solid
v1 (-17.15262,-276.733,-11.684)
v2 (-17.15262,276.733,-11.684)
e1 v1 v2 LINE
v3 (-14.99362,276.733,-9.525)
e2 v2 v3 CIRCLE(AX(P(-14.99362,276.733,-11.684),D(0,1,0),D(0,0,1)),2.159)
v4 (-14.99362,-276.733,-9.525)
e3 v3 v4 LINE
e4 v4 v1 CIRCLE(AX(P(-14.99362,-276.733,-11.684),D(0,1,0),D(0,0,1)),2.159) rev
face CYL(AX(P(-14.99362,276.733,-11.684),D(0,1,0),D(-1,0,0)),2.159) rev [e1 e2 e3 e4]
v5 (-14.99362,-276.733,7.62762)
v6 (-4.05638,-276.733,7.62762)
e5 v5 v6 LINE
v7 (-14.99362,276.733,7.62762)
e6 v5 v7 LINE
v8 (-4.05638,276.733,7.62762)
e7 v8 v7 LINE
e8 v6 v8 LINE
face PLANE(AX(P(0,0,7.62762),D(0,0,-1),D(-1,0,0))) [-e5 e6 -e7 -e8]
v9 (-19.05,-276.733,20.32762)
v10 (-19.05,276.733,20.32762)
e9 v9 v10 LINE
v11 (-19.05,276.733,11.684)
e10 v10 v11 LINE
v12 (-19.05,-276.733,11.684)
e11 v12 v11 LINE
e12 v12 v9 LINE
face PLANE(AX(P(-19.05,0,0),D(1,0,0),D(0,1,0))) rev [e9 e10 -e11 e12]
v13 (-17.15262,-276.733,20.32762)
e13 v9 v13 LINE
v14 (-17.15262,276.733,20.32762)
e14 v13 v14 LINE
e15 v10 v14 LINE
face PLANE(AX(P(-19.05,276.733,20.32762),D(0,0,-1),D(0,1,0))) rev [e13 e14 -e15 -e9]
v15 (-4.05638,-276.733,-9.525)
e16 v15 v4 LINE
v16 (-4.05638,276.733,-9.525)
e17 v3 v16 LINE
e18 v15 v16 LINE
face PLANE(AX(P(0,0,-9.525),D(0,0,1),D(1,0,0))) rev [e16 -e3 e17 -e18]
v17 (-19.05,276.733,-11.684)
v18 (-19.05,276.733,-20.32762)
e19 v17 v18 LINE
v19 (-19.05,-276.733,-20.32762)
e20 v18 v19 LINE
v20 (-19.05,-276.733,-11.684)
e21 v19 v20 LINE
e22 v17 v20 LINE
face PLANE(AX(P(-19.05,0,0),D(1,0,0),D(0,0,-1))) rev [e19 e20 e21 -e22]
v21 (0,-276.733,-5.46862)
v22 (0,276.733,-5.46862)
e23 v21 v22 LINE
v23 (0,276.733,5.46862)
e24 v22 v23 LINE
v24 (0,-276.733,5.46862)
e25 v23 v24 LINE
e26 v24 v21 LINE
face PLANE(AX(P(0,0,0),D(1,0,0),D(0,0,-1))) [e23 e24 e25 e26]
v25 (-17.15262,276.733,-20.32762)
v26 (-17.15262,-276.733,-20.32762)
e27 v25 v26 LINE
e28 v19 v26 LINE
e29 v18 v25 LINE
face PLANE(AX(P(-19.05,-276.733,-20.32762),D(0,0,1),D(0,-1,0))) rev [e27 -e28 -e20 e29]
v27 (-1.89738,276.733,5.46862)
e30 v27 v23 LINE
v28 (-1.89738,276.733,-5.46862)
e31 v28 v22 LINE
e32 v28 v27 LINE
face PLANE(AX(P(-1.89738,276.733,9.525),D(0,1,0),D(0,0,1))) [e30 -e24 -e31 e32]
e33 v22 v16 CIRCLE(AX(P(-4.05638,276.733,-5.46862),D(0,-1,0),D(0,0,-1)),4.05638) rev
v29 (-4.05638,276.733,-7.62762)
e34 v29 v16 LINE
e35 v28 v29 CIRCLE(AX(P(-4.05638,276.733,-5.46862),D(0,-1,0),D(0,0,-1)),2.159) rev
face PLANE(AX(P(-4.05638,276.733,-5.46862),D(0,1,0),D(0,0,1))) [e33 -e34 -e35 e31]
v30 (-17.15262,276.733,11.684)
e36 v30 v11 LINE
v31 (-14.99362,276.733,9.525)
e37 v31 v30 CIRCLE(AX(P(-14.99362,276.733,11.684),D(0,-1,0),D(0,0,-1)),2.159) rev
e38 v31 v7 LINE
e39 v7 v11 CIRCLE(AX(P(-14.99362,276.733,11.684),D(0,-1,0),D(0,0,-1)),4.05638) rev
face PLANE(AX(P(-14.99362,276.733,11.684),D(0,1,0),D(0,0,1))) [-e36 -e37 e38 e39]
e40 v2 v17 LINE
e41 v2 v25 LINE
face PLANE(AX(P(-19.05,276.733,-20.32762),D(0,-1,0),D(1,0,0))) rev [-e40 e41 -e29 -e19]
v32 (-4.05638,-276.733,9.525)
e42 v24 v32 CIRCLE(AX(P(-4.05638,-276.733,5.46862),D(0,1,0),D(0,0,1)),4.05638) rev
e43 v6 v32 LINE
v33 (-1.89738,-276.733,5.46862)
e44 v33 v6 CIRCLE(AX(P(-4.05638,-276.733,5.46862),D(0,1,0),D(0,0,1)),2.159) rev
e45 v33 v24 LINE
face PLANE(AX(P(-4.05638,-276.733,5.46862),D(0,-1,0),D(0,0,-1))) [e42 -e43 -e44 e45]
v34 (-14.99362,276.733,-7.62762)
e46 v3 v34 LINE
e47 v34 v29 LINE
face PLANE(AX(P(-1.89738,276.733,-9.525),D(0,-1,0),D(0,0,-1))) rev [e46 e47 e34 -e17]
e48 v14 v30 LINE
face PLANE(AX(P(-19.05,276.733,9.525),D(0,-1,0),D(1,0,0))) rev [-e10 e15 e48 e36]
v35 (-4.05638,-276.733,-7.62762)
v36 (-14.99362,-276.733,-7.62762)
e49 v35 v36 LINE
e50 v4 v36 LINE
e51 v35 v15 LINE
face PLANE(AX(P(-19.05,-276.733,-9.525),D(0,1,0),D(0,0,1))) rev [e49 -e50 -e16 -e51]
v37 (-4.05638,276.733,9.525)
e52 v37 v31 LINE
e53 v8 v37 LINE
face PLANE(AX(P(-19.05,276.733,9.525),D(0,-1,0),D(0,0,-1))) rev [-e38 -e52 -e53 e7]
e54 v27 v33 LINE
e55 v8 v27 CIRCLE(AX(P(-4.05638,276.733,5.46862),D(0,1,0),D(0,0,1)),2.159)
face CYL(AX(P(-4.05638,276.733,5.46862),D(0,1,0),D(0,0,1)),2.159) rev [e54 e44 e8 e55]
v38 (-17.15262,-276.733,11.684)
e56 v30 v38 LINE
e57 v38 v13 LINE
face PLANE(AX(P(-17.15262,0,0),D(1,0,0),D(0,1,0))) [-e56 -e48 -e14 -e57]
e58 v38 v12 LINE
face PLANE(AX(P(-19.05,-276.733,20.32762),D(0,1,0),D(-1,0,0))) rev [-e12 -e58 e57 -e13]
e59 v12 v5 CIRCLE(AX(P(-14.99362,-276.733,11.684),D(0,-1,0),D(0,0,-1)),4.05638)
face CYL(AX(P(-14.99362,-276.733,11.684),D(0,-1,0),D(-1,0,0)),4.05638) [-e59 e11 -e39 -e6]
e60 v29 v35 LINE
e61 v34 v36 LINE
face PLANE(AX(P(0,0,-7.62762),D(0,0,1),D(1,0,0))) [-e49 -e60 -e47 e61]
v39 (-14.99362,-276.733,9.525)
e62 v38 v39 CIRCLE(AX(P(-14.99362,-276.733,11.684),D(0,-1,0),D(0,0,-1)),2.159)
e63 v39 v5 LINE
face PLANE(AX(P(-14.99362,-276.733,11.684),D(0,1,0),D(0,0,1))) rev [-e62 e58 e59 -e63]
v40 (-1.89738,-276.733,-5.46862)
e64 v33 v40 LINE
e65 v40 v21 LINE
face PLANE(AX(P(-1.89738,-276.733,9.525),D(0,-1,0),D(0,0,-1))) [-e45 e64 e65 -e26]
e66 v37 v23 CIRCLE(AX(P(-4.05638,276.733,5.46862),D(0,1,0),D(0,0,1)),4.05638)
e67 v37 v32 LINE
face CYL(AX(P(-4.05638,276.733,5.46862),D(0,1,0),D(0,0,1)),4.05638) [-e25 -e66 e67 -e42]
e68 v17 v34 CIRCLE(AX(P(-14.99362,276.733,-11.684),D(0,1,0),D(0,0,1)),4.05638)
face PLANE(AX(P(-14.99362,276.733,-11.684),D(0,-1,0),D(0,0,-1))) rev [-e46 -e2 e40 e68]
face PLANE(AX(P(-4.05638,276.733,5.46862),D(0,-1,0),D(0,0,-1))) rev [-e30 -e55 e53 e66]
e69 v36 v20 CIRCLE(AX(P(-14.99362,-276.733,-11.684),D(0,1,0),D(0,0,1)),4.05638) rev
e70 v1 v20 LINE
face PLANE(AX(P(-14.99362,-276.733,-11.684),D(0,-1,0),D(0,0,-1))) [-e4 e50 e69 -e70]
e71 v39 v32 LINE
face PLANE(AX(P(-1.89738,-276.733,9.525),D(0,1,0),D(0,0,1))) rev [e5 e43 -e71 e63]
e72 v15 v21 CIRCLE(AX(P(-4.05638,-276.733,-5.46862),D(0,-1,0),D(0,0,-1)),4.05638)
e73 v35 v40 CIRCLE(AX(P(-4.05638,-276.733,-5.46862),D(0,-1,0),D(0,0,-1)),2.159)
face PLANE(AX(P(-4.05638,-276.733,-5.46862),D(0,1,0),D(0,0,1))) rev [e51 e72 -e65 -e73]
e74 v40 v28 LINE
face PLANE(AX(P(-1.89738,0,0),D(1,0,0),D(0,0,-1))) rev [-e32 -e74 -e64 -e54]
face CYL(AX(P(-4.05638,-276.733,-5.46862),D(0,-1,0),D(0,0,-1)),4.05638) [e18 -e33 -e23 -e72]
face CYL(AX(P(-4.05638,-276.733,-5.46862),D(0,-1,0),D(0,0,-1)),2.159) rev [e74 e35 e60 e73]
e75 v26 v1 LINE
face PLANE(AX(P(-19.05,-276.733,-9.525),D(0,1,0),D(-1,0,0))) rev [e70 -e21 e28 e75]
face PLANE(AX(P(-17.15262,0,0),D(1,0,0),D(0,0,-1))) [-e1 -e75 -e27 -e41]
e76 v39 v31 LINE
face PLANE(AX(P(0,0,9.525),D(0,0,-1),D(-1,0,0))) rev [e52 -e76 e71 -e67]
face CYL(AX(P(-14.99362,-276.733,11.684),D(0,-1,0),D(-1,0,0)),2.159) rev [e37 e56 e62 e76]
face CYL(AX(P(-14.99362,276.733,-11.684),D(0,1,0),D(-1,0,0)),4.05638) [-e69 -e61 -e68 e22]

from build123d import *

# Parameters (mm, degrees)
SKETCH2_W                      = 19.05
SKETCH2_H                      = 553.466
BASE_FLANGE1_DEPTH             = 1.89738
EDGE_FLANGE1_STRIP_W           = 11.90752
EDGE_FLANGE1_STRIP_H           = 1.89738
EDGE_FLANGE1_STRIP_CUT_DEPTH   = 553.466
EDGE_FLANGE1_STRIP_2_W         = 11.90752
EDGE_FLANGE1_STRIP_2_H         = 1.89738
EDGE_FLANGE1_STRIP_CUT_2_DEPTH = 553.466
EDGE_FLANGE1_DEPTH             = 553.466
EDGE_FLANGE1_BEND_DEPTH        = 553.466
EDGE_FLANGE2_STRIP_W           = 11.90752
EDGE_FLANGE2_STRIP_H           = 1.89738
EDGE_FLANGE2_STRIP_CUT_DEPTH   = 553.466
EDGE_FLANGE2_STRIP_2_W         = 11.90752
EDGE_FLANGE2_STRIP_2_H         = 1.89738
EDGE_FLANGE2_STRIP_CUT_2_DEPTH = 553.466
EDGE_FLANGE2_DEPTH             = 553.466
EDGE_FLANGE2_BEND_DEPTH        = 553.466


# Sheet-metal steps are written as plain solids
with BuildPart() as part:
    # Sketch2 → Base-Flange1 (new body)
    with BuildSketch(Plane(origin=(0, 0, 0), x_dir=(0, 0, -1), z_dir=(1, 0, 0))):
        Rectangle(SKETCH2_W, SKETCH2_H)
    extrude(amount=-BASE_FLANGE1_DEPTH)

    # Edge-Flange1 strip (across the edge) → Edge-Flange1 strip cut (cut)
    with BuildSketch(Plane(origin=(-1.89738, -276.733, 9.525), x_dir=(0, 0, -1), z_dir=(0, 1, 0))):
        with Locations((-1.89738, -0.94869)):
            Rectangle(EDGE_FLANGE1_STRIP_W, EDGE_FLANGE1_STRIP_H)
    extrude(amount=EDGE_FLANGE1_STRIP_CUT_DEPTH, mode=Mode.SUBTRACT)

    # Edge-Flange1 strip 2 (across the edge) → Edge-Flange1 strip cut 2 (cut)
    with BuildSketch(Plane(origin=(-1.89738, 276.733, -9.525), x_dir=(0, 0, 1), z_dir=(0, -1, 0))):
        with Locations((-1.89738, -0.94869)):
            Rectangle(EDGE_FLANGE1_STRIP_2_W, EDGE_FLANGE1_STRIP_2_H)
    extrude(amount=EDGE_FLANGE1_STRIP_CUT_2_DEPTH, mode=Mode.SUBTRACT)

    # Edge-Flange1 section (across the edge) → Edge-Flange1 (add)
    with BuildSketch(Plane(origin=(-1.89738, -276.733, 9.525), x_dir=(0, 0, -1), z_dir=(0, 1, 0))):
        with BuildLine():
            Line((0, 2.159), (0, 17.15262))
            Line((0, 17.15262), (1.89738, 17.15262))
            Line((1.89738, 17.15262), (1.89738, 2.159))
            ThreePointArc((1.89738, 2.159), (2.529736459, 0.632356459), (4.05638, 0))
            Line((4.05638, 0), (4.05638, -1.89738))
            ThreePointArc((4.05638, -1.89738), (1.188086195, -0.709293805), (0, 2.159))
        make_face()
    extrude(amount=EDGE_FLANGE1_DEPTH)

    # Edge-Flange1 section 2 (across the edge) → Edge-Flange1 bend (add)
    with BuildSketch(Plane(origin=(-1.89738, 276.733, -9.525), x_dir=(0, 0, 1), z_dir=(0, -1, 0))):
        with BuildLine():
            Line((0, 2.159), (0, 17.15262))
            Line((0, 17.15262), (1.89738, 17.15262))
            Line((1.89738, 17.15262), (1.89738, 2.159))
            ThreePointArc((1.89738, 2.159), (2.529736459, 0.632356459), (4.05638, 0))
            Line((4.05638, 0), (4.05638, -1.89738))
            ThreePointArc((4.05638, -1.89738), (1.188086195, -0.709293805), (0, 2.159))
        make_face()
    extrude(amount=EDGE_FLANGE1_BEND_DEPTH)

    # Edge-Flange2 strip (across the edge) → Edge-Flange2 strip cut (cut)
    with BuildSketch(Plane(origin=(-19.05, -276.733, -9.525), x_dir=(1, 0, 0), z_dir=(0, 1, 0))):
        with Locations((-1.89738, -0.94869)):
            Rectangle(EDGE_FLANGE2_STRIP_W, EDGE_FLANGE2_STRIP_H)
    extrude(amount=EDGE_FLANGE2_STRIP_CUT_DEPTH, mode=Mode.SUBTRACT)

    # Edge-Flange2 strip 2 (across the edge) → Edge-Flange2 strip cut 2 (cut)
    with BuildSketch(Plane(origin=(-19.05, 276.733, 9.525), x_dir=(1, 0, 0), z_dir=(0, -1, 0))):
        with Locations((-1.89738, -0.94869)):
            Rectangle(EDGE_FLANGE2_STRIP_2_W, EDGE_FLANGE2_STRIP_2_H)
    extrude(amount=EDGE_FLANGE2_STRIP_CUT_2_DEPTH, mode=Mode.SUBTRACT)

    # Edge-Flange2 section (across the edge) → Edge-Flange2 (add)
    with BuildSketch(Plane(origin=(-19.05, -276.733, -9.525), x_dir=(1, 0, 0), z_dir=(0, 1, 0))):
        with BuildLine():
            Line((0, 2.159), (0, 10.80262))
            Line((0, 10.80262), (1.89738, 10.80262))
            Line((1.89738, 10.80262), (1.89738, 2.159))
            ThreePointArc((1.89738, 2.159), (2.529736459, 0.632356459), (4.05638, 0))
            Line((4.05638, 0), (4.05638, -1.89738))
            ThreePointArc((4.05638, -1.89738), (1.188086195, -0.709293805), (0, 2.159))
        make_face()
    extrude(amount=EDGE_FLANGE2_DEPTH)

    # Edge-Flange2 section 2 (across the edge) → Edge-Flange2 bend (add)
    with BuildSketch(Plane(origin=(-19.05, 276.733, 9.525), x_dir=(1, 0, 0), z_dir=(0, -1, 0))):
        with BuildLine():
            Line((0, 2.159), (0, 10.80262))
            Line((0, 10.80262), (1.89738, 10.80262))
            Line((1.89738, 10.80262), (1.89738, 2.159))
            ThreePointArc((1.89738, 2.159), (2.529736459, 0.632356459), (4.05638, 0))
            Line((4.05638, 0), (4.05638, -1.89738))
            ThreePointArc((4.05638, -1.89738), (1.188086195, -0.709293805), (0, 2.159))
        make_face()
    extrude(amount=EDGE_FLANGE2_BEND_DEPTH)


solid = part.part
